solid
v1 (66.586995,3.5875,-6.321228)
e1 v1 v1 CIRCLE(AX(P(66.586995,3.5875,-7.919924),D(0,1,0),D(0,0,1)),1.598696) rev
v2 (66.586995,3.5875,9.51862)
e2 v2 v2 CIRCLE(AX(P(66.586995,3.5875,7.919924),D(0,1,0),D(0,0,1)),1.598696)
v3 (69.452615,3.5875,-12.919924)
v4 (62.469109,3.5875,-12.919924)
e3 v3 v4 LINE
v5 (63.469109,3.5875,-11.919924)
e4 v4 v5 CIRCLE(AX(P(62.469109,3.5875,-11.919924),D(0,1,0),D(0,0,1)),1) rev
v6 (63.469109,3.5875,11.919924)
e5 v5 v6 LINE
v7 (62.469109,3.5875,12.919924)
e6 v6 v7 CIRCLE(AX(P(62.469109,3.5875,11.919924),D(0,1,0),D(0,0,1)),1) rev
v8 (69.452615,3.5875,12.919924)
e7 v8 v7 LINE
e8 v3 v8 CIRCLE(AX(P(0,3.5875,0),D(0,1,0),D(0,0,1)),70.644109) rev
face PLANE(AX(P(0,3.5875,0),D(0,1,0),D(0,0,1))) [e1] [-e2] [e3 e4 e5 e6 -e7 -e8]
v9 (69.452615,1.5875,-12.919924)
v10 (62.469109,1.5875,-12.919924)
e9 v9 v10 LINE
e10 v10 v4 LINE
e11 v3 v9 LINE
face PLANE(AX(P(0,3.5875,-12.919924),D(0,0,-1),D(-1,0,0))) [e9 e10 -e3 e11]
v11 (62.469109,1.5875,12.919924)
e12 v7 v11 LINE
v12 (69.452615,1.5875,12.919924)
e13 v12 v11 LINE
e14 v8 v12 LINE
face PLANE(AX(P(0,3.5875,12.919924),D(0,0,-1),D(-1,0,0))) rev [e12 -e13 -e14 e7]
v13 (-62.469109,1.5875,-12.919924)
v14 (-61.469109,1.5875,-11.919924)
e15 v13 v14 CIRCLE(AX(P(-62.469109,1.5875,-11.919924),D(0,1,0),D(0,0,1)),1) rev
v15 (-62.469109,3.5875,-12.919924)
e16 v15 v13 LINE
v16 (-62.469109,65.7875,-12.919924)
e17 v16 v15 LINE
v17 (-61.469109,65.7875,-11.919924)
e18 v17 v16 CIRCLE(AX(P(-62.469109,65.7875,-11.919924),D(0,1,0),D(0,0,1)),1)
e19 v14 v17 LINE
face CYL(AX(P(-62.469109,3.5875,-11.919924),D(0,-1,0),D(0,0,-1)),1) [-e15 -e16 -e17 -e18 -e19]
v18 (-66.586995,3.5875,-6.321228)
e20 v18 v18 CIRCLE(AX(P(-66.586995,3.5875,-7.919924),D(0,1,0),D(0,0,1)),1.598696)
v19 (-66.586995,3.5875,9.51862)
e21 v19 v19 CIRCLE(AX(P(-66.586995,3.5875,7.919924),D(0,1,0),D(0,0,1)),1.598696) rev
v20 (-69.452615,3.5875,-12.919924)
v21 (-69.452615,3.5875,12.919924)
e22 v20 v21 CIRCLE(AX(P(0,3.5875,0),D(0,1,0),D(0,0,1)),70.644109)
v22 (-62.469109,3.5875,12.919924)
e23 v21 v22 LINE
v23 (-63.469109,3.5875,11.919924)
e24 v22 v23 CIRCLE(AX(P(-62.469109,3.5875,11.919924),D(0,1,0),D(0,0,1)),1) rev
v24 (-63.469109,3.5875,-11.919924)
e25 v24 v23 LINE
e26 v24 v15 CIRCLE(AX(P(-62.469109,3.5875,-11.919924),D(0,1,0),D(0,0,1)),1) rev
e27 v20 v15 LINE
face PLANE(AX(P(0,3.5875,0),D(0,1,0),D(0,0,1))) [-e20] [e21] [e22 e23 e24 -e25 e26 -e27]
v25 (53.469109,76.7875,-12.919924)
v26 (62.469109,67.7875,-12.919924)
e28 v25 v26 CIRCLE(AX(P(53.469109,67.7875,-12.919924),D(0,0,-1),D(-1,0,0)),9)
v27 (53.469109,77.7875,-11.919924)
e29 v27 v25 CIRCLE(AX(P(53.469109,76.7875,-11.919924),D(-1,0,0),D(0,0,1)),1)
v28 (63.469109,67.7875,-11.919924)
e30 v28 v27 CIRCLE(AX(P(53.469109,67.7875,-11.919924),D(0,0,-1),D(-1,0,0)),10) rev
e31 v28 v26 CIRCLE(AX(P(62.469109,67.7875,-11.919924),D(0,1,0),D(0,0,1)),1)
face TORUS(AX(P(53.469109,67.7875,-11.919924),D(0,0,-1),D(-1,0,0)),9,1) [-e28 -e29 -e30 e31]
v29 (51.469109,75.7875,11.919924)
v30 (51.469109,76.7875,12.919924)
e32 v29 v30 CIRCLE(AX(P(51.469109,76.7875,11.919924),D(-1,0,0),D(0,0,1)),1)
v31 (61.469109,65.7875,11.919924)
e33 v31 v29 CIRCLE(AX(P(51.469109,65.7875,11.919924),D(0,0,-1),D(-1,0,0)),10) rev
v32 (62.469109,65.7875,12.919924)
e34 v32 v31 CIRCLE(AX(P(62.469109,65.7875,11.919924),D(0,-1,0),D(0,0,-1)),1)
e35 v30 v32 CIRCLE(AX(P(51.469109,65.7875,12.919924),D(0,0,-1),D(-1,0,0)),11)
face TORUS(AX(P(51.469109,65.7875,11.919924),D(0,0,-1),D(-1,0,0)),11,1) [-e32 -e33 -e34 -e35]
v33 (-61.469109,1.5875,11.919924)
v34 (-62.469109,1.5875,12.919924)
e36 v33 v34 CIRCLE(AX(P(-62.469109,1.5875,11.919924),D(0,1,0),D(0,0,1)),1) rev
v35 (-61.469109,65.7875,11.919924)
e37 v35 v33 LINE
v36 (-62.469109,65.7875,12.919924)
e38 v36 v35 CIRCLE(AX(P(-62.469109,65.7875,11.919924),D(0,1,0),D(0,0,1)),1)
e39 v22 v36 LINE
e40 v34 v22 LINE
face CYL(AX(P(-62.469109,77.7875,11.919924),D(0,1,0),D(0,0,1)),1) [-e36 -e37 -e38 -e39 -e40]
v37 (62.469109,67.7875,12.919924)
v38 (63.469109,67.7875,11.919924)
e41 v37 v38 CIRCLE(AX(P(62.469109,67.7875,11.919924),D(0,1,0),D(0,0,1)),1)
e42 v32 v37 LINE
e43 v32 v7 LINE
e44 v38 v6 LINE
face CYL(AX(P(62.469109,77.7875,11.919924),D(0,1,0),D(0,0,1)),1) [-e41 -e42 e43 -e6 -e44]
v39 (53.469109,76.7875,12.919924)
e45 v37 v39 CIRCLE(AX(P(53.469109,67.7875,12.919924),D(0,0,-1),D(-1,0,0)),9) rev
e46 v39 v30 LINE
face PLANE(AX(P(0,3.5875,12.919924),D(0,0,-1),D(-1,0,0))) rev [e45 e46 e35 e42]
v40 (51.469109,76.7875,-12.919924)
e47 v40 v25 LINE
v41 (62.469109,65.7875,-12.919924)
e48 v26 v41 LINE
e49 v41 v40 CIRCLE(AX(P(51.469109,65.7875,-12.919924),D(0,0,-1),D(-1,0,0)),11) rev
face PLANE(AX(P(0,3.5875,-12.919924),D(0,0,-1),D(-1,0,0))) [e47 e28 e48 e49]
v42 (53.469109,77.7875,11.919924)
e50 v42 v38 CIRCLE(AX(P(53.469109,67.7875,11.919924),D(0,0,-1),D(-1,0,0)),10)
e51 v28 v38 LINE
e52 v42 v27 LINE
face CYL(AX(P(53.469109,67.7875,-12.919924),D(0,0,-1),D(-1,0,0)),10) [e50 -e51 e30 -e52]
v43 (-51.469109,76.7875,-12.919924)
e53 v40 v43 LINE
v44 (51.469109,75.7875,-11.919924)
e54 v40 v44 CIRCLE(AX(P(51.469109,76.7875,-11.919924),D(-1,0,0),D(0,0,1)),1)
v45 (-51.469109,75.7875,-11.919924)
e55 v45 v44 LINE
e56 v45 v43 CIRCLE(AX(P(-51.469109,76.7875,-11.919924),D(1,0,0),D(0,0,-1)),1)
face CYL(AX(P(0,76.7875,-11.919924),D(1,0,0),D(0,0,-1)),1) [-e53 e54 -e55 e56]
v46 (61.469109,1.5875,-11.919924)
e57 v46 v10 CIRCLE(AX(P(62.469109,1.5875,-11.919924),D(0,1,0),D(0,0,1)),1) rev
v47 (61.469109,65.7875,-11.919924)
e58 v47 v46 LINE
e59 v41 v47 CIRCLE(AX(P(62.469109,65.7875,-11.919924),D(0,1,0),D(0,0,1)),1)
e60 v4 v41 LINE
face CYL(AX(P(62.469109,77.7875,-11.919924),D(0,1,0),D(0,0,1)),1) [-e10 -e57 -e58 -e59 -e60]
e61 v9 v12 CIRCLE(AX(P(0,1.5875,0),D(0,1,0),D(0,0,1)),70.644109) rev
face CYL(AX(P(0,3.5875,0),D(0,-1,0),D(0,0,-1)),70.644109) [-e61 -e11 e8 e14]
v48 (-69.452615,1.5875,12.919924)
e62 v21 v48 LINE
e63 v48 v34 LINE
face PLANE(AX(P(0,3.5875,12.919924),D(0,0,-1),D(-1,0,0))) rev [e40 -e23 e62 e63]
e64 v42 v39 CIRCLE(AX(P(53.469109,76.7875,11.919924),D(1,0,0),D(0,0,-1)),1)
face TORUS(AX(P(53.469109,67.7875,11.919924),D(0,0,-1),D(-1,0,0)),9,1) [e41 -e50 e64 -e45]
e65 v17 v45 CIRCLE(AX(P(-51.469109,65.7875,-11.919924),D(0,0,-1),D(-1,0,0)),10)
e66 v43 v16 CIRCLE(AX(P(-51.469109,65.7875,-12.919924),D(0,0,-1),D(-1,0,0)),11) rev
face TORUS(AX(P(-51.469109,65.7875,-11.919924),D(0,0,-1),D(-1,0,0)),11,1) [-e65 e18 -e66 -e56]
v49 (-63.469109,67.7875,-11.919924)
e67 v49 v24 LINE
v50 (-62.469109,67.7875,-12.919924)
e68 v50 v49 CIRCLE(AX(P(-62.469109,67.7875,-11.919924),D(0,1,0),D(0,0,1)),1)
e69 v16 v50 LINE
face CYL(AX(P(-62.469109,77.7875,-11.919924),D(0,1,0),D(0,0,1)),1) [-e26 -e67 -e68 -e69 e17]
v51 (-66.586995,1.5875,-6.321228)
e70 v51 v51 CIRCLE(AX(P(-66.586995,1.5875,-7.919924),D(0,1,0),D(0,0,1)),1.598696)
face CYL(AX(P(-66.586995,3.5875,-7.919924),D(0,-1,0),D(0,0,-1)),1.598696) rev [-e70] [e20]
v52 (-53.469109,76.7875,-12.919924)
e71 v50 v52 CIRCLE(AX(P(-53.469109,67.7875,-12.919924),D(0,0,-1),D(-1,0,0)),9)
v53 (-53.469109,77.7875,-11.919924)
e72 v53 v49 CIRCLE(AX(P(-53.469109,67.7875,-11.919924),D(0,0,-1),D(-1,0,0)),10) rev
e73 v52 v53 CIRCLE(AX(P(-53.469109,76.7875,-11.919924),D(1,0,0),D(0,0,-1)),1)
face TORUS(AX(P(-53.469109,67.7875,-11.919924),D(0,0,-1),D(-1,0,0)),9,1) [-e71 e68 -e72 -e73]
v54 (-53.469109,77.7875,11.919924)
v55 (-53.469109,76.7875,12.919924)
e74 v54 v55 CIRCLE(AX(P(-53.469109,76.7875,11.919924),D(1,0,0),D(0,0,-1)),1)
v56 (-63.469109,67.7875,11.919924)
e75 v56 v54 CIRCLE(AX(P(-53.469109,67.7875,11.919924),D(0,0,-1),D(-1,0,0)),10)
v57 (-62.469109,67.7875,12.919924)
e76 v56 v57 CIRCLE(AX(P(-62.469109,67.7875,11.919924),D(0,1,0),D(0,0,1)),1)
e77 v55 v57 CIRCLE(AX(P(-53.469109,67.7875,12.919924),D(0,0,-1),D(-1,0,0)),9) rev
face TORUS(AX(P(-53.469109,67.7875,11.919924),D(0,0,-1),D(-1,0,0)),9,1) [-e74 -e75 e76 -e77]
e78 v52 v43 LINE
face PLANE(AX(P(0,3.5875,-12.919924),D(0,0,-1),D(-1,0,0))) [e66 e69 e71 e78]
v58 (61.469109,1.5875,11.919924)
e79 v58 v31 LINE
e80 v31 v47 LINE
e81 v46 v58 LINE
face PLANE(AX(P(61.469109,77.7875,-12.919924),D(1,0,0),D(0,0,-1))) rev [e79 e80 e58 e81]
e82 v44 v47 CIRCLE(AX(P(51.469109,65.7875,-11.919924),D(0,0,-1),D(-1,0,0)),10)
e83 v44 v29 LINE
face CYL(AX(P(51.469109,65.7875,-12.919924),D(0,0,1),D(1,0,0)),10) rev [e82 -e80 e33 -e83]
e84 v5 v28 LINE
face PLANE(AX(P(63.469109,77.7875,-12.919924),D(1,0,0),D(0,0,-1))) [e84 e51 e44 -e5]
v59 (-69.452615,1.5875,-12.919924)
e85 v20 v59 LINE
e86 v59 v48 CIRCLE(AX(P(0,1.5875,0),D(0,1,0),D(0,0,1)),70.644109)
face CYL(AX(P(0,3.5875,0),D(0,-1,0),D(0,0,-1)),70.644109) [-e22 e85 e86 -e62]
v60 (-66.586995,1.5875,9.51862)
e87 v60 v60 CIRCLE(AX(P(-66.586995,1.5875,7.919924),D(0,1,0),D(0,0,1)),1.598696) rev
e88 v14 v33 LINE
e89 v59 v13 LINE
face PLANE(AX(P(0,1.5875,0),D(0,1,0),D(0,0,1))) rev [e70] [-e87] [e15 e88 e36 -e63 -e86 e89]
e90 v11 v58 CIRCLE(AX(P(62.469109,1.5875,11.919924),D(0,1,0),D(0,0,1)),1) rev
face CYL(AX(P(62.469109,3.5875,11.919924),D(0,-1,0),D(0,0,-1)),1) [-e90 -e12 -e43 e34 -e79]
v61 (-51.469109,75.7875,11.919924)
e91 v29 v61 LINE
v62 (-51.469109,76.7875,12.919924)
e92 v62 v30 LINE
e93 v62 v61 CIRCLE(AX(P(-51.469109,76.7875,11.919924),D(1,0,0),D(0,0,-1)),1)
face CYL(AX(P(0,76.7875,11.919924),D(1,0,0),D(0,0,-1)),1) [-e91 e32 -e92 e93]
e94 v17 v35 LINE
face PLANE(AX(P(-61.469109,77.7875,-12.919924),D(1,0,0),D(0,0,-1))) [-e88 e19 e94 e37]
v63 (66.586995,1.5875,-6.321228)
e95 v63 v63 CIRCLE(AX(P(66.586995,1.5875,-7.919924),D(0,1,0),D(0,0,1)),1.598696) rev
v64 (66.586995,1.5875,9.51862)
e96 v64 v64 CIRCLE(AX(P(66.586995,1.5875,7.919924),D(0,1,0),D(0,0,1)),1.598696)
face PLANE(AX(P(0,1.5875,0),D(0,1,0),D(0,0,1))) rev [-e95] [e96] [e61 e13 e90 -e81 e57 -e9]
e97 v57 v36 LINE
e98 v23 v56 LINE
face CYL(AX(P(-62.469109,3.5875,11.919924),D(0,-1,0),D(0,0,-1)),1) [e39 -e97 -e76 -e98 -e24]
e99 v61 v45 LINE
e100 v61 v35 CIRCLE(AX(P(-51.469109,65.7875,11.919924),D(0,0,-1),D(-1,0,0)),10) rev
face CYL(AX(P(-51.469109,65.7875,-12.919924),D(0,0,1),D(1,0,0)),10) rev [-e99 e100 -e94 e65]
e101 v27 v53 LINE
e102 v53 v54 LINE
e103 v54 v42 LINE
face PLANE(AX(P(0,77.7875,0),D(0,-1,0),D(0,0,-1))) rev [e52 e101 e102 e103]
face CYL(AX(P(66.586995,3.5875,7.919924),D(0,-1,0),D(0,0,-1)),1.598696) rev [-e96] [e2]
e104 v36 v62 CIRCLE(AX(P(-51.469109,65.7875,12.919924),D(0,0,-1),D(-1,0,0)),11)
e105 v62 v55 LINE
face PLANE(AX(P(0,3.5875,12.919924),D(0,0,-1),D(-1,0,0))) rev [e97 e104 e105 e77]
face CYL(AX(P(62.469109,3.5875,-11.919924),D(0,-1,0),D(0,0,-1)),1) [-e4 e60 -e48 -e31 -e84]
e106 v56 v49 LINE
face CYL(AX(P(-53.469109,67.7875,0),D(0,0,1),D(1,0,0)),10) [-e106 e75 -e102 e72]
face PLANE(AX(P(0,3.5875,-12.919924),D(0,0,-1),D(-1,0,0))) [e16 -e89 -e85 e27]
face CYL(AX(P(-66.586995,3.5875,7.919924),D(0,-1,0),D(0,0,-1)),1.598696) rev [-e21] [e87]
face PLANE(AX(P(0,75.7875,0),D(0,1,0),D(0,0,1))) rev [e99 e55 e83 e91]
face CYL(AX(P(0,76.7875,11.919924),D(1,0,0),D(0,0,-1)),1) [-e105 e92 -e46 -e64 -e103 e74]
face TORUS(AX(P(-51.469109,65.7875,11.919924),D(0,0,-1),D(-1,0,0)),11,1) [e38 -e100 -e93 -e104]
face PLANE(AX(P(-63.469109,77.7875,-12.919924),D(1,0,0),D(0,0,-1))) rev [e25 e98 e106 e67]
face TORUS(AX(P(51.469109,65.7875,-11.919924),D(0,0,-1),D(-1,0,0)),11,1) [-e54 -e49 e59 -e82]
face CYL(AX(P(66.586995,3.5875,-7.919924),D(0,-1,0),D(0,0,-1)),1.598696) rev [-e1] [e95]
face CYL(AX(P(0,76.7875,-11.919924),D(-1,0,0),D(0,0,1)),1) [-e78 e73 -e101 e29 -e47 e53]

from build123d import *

# Parameters (mm, degrees)
SKETCH1_R            = 1.5875
BOSS_EXTRUDE5_DEPTH  = 1.5875
FILLET2_R            = 2.54
FILLET3_R            = 2.54
FILLET4_R            = 5.08
CUT_EXTRUDE1_START   = -2.54
SKETCH2_R            = 2.38125
SKETCH2_R_2          = 1.5875
CUT_EXTRUDE1_DEPTH   = 2.54
SKETCH3_R            = 1.5875
CUT_EXTRUDE2_DEPTH   = 2.54
CUT_EXTRUDE3_DEPTH   = 2.54
SKETCH5_W            = 15
SKETCH5_H            = 34.925
CUT_EXTRUDE4_DEPTH   = 109.650407999
FILLET5_R            = 7.62
FILLET6_R            = 7.62
BOSS_EXTRUDE6_START  = -1.5875
BOSS_EXTRUDE6_DEPTH  = 1.5875
SKETCH7_R            = 79.375
CUT_EXTRUDE5_DEPTH   = 0.5875
BOSS_EXTRUDE7_START  = -1
SKETCH8_R            = 1.5875
SKETCH8_R_2          = 2.38125
BOSS_EXTRUDE7_DEPTH  = 1
SKETCH9_R            = 1.5875
CUT_EXTRUDE7_DEPTH   = 2.54
BOSS_EXTRUDE8_START  = -1
BOSS_EXTRUDE8_DEPTH  = 1
CUT_EXTRUDE9_START   = -2.54
CUT_EXTRUDE9_DEPTH   = 2.54
BOSS_EXTRUDE9_START  = -1
BOSS_EXTRUDE9_DEPTH  = 1
CUT_EXTRUDE10_START  = -2.54
CUT_EXTRUDE10_DEPTH  = 2.54
BOSS_EXTRUDE10_START = -1
BOSS_EXTRUDE10_DEPTH = 1
CUT_EXTRUDE11_START  = -2.54
CUT_EXTRUDE11_DEPTH  = 2.54
BOSS_EXTRUDE11_START = -1
BOSS_EXTRUDE11_DEPTH = 1
SKETCH18_R           = 1.598696058
BOSS_EXTRUDE14_DEPTH = 2
SKETCH22_W           = 2
SKETCH22_H           = 25.839848816
BOSS_EXTRUDE16_DEPTH = 76.2
SKETCH23_W           = 122.93821768
SKETCH23_H           = 25.839848816
BOSS_EXTRUDE17_DEPTH = 2
FILLET7_R            = 10
CUT_EXTRUDE12_START  = -2
SKETCH24_R           = 79.375
CUT_EXTRUDE12_DEPTH  = 2
FILLET11_R           = 1
FILLET12_R           = 1


# Some blends are built 0.0001 mm under size
with BuildPart() as part:
    # Sketch1 → Boss-Extrude5 (new body)
    with BuildSketch(Plane(origin=(0, 0, 0), x_dir=(1, 0, 0), z_dir=(0, 1, 0))):
        with BuildLine():
            ThreePointArc((-63.5, -47.625), (-35.497579143, -70.995158286), (0, -79.375))
            ThreePointArc((0, -79.375), (35.497579143, -70.995158286), (63.5, -47.625))
            Line((63.5, -47.625), (50.8, -47.625))
            Line((50.8, -47.625), (50.8, 22.225))
            Line((50.8, 22.225), (76.2, 22.225))
            ThreePointArc((76.2, 22.225), (0, 79.375), (-76.2, 22.225))
            Line((-76.2, 22.225), (-50.8, 22.225))
            Line((-50.8, 22.225), (-50.8, -47.625))
            Line((-50.8, -47.625), (-63.5, -47.625))
        make_face()
        with Locations(Location((-7.14375, -66.675, 0), (0, 0, 270))):
            Circle(SKETCH1_R, mode=Mode.SUBTRACT)
        with BuildLine():
            ThreePointArc((8.73125, -66.675), (7.14375, -68.2625), (5.55625, -66.675))
            ThreePointArc((5.55625, -66.675), (7.14375, -65.0875), (8.73125, -66.675))
        make_face(mode=Mode.SUBTRACT)
        with Locations(Location((-7.14375, 66.675, 0), (0, 0, 270))):
            Circle(SKETCH1_R, mode=Mode.SUBTRACT)
        with Locations(Location((7.14375, 66.675, 0), (0, 0, 270))):
            Circle(SKETCH1_R, mode=Mode.SUBTRACT)
    extrude(amount=BOSS_EXTRUDE5_DEPTH)

    # Fillet2
    fillet2_edges = [part.edges().sort_by_distance(p)[0] for p in [
        (-63.5, 0.79375, 47.625),
    ]]
    fillet(fillet2_edges, radius=FILLET2_R)

    # Fillet3
    fillet3_edges = [part.edges().sort_by_distance(p)[0] for p in [
        (63.5, 0.79375, 47.625),
    ]]
    fillet(fillet3_edges, radius=FILLET3_R)

    # Fillet4
    fillet4_edges = [part.edges().sort_by_distance(p)[0] for p in [
        (-76.2, 0.79375, -22.225),
        (76.2, 0.79375, -22.225),
    ]]
    fillet(fillet4_edges, radius=FILLET4_R)

    # Sketch2 → Cut-Extrude1 (cut)
    # profile 1 of 10: a face of its own
    with BuildSketch(Plane(origin=(0, 1.5875, 0), x_dir=(1, 0, 0), z_dir=(0, 1, 0)).offset(CUT_EXTRUDE1_START)):
        with BuildLine():
            Line((-61.088622125, 27.654457796), (-59.642408406, 26.999765402))
            ThreePointArc((-59.642408406, 26.999765402), (-52.384826382, 39.268743005), (-42.643785254, 49.676068599))
            Line((-42.643785254, 49.676068599), (-43.677815048, 50.880617741))
            Line((-43.677815048, 50.880617741), (-44.711844841, 52.085166883))
            ThreePointArc((-44.711844841, 52.085166883), (-54.925289002, 41.173126022), (-62.534835843, 28.309150189))
            Line((-62.534835843, 28.309150189), (-61.088622125, 27.654457796))
        make_face()
    # profile 2 of 10: a face of its own
    with BuildSketch(Plane(origin=(0, 1.5875, 0), x_dir=(1, 0, 0), z_dir=(0, 1, 0)).offset(CUT_EXTRUDE1_START)):
        with BuildLine():
            Line((-39.077069744, 54.493774041), (-38.151958122, 53.203686937))
            ThreePointArc((-38.151958122, 53.203686937), (-25.732218917, 60.200142208), (-12.092567045, 64.342629994))
            Line((-12.092567045, 64.342629994), (-12.385788543, 65.902815048))
            Line((-12.385788543, 65.902815048), (-12.679010041, 67.463000102))
            ThreePointArc((-12.679010041, 67.463000102), (-26.980132574, 63.119617589), (-40.002181367, 55.783861145))
            Line((-40.002181367, 55.783861145), (-39.077069744, 54.493774041))
        make_face()
    # profile 3 of 10: a face of its own
    with BuildSketch(Plane(origin=(0, 1.5875, 0), x_dir=(1, 0, 0), z_dir=(0, 1, 0)).offset(CUT_EXTRUDE1_START)):
        with Locations(Location((-7.14375, 66.675, 0), (0, 0, 270))):
            Circle(SKETCH2_R)
        with Locations((-7.14375, 66.675)):
            Circle(SKETCH2_R_2, mode=Mode.SUBTRACT)
    # profile 4 of 10: a face of its own
    with BuildSketch(Plane(origin=(0, 1.5875, 0), x_dir=(1, 0, 0), z_dir=(0, 1, 0)).offset(CUT_EXTRUDE1_START)):
        with Locations(Location((7.14375, 66.675, 0), (0, 0, 270))):
            Circle(SKETCH2_R)
        with Locations((7.14375, 66.675)):
            Circle(SKETCH2_R_2, mode=Mode.SUBTRACT)
    # profile 5 of 10: a face of its own
    with BuildSketch(Plane(origin=(0, 1.5875, 0), x_dir=(1, 0, 0), z_dir=(0, 1, 0)).offset(CUT_EXTRUDE1_START)):
        with BuildLine():
            ThreePointArc((12.679010041, 67.463000102), (26.980132574, 63.119617589), (40.002181367, 55.783861145))
            Line((40.002181367, 55.783861145), (39.077069744, 54.493774041))
            Line((39.077069744, 54.493774041), (38.151958122, 53.203686937))
            ThreePointArc((38.151958122, 53.203686937), (25.732218917, 60.200142208), (12.092567045, 64.342629994))
            Line((12.092567045, 64.342629994), (12.385788543, 65.902815048))
            Line((12.385788543, 65.902815048), (12.679010041, 67.463000102))
        make_face()
    # profile 6 of 10: a face of its own
    with BuildSketch(Plane(origin=(0, 1.5875, 0), x_dir=(1, 0, 0), z_dir=(0, 1, 0)).offset(CUT_EXTRUDE1_START)):
        with BuildLine():
            ThreePointArc((44.711844841, 52.085166883), (54.925289002, 41.173126022), (62.534835843, 28.309150189))
            Line((62.534835843, 28.309150189), (59.642408406, 26.999765402))
            ThreePointArc((59.642408406, 26.999765402), (52.384826382, 39.268743005), (42.643785254, 49.676068599))
            Line((42.643785254, 49.676068599), (43.677815048, 50.880617741))
            Line((43.677815048, 50.880617741), (44.711844841, 52.085166883))
        make_face()
    # profile 7 of 10: a face of its own
    with BuildSketch(Plane(origin=(0, 1.5875, 0), x_dir=(1, 0, 0), z_dir=(0, 1, 0)).offset(CUT_EXTRUDE1_START)):
        with BuildLine():
            ThreePointArc((-12.679010041, -67.463000102), (-26.980132574, -63.119617589), (-40.002181367, -55.783861145))
            Line((-40.002181367, -55.783861145), (-39.077069744, -54.493774041))
            Line((-39.077069744, -54.493774041), (-38.151958122, -53.203686937))
            ThreePointArc((-38.151958122, -53.203686937), (-25.732218917, -60.200142208), (-12.092567045, -64.342629994))
            Line((-12.092567045, -64.342629994), (-12.385788543, -65.902815048))
            Line((-12.385788543, -65.902815048), (-12.679010041, -67.463000102))
        make_face()
    # profile 8 of 10: a face of its own
    with BuildSketch(Plane(origin=(0, 1.5875, 0), x_dir=(1, 0, 0), z_dir=(0, 1, 0)).offset(CUT_EXTRUDE1_START)):
        with Locations(Location((-7.14375, -66.675, 0), (0, 0, 270))):
            Circle(SKETCH2_R)
        with Locations((-7.14375, -66.675)):
            Circle(SKETCH2_R_2, mode=Mode.SUBTRACT)
    # profile 9 of 10: a face of its own
    with BuildSketch(Plane(origin=(0, 1.5875, 0), x_dir=(1, 0, 0), z_dir=(0, 1, 0)).offset(CUT_EXTRUDE1_START)):
        with Locations(Location((7.14375, -66.675, 0), (0, 0, 270))):
            Circle(SKETCH2_R)
        with Locations((7.14375, -66.675)):
            Circle(SKETCH2_R_2, mode=Mode.SUBTRACT)
    # profile 10 of 10: a face of its own
    with BuildSketch(Plane(origin=(0, 1.5875, 0), x_dir=(1, 0, 0), z_dir=(0, 1, 0)).offset(CUT_EXTRUDE1_START)):
        with BuildLine():
            ThreePointArc((12.092567045, -64.342629994), (25.732218917, -60.200142208), (38.151958122, -53.203686937))
            Line((38.151958122, -53.203686937), (39.077069744, -54.493774041))
            Line((39.077069744, -54.493774041), (40.002181367, -55.783861145))
            ThreePointArc((40.002181367, -55.783861145), (26.980132574, -63.119617589), (12.679010041, -67.463000102))
            Line((12.679010041, -67.463000102), (12.385788543, -65.902815048))
            Line((12.385788543, -65.902815048), (12.092567045, -64.342629994))
        make_face()
    extrude(amount=CUT_EXTRUDE1_DEPTH, mode=Mode.SUBTRACT)

    # Sketch3 → Cut-Extrude2 (cut)
    with BuildSketch(Plane(origin=(0, 1.5875, 0), x_dir=(1, 0, 0), z_dir=(0, 1, 0))):
        with Locations(Location((-44.45, -47.625, 0), (0, 0, 270))):
            Circle(SKETCH3_R)
        with Locations(Location((-44.45, 22.225, 0), (0, 0, 270))):
            Circle(SKETCH3_R)
        with Locations(Location((44.45, 22.225, 0), (0, 0, 270))):
            Circle(SKETCH3_R)
        with Locations(Location((44.45, -47.625, 0), (0, 0, 270))):
            Circle(SKETCH3_R)
    extrude(amount=-CUT_EXTRUDE2_DEPTH, mode=Mode.SUBTRACT)

    # Sketch4 → Cut-Extrude3 (cut)
    with BuildSketch(Plane(origin=(0, 1.5875, 0), x_dir=(1, 0, 0), z_dir=(0, 1, 0))):
        with BuildLine():
            ThreePointArc((-44.45, -11.1125), (-46.0375, -12.7), (-44.45, -14.2875))
            Line((-44.45, -14.2875), (-44.45, -11.1125))
        make_face()
        with BuildLine():
            Line((-44.45, -11.1125), (-44.45, -14.2875))
            ThreePointArc((-44.45, -14.2875), (-43.327467985, -13.822532015), (-42.8625, -12.7))
            ThreePointArc((-42.8625, -12.7), (-43.327467985, -11.577467985), (-44.45, -11.1125))
        make_face()
        with BuildLine():
            ThreePointArc((44.45, -11.1125), (42.8625, -12.7), (44.45, -14.2875))
            Line((44.45, -14.2875), (44.45, -11.1125))
        make_face()
        with BuildLine():
            Line((44.45, -11.1125), (44.45, -14.2875))
            ThreePointArc((44.45, -14.2875), (45.572532015, -13.822532015), (46.0375, -12.7))
            ThreePointArc((46.0375, -12.7), (45.572532015, -11.577467985), (44.45, -11.1125))
        make_face()
    extrude(amount=-CUT_EXTRUDE3_DEPTH, mode=Mode.SUBTRACT)

    # Sketch5 → Cut-Extrude4 (cut, through all)
    with BuildSketch(Plane(origin=(0, 1.5875, 0), x_dir=(1, 0, 0), z_dir=(0, 1, 0))):
        with Locations((-27.3, 4.7625)):
            Rectangle(SKETCH5_W, SKETCH5_H)
        with Locations((27.3, 4.7625)):
            Rectangle(SKETCH5_W, SKETCH5_H)
    extrude(amount=-CUT_EXTRUDE4_DEPTH, mode=Mode.SUBTRACT)

    # Fillet5
    # the kernel refuses this fillet: 7.62 mm, written as the material it adds along each edge
    with BuildSketch(Plane(origin=(-19.8, 1.5875, 12.7), x_dir=(0, 0, -1), z_dir=(0, -1, 0))) as fillet5_piece_1:
        with BuildLine():
            CenterArc((FILLET5_R, -FILLET5_R), FILLET5_R, 90, 90)
            Line((0, -FILLET5_R), (0, 0))
            Line((0, 0), (FILLET5_R, 0))
        make_face()
    extrude(amount=1.5875)
    with BuildSketch(Plane(origin=(-34.8, 1.5875, 12.7), x_dir=(0, 0, -1), z_dir=(0, -1, 0)), Plane(origin=(-19.8, 1.5875, -22.225), x_dir=(0, 0, 1), z_dir=(0, -1, 0)), Plane(origin=(-34.8, 1.5875, -22.225), x_dir=(1, 0, 0), z_dir=(0, -1, 0))) as fillet5_piece_2:
        with BuildLine():
            CenterArc((FILLET5_R, FILLET5_R), FILLET5_R, 180, 90)
            Line((0, FILLET5_R), (0, 0))
            Line((0, 0), (FILLET5_R, 0))
        make_face()
    extrude(amount=1.5875)

    # Fillet6
    # the kernel refuses this fillet: 7.62 mm, written as the material it adds along each edge
    with BuildSketch(Plane(origin=(34.8, 1.5875, 12.7), x_dir=(0, 0, -1), z_dir=(0, -1, 0)), Plane(origin=(34.8, 1.5875, -22.225), x_dir=(-1, 0, 0), z_dir=(0, -1, 0))) as fillet6_piece_1:
        with BuildLine():
            CenterArc((FILLET6_R, -FILLET6_R), FILLET6_R, 90, 90)
            Line((0, -FILLET6_R), (0, 0))
            Line((0, 0), (FILLET6_R, 0))
        make_face()
    extrude(amount=1.5875)
    with BuildSketch(Plane(origin=(19.8, 1.5875, -22.225), x_dir=(1, 0, 0), z_dir=(0, -1, 0)), Plane(origin=(19.8, 1.5875, 12.7), x_dir=(0, 0, -1), z_dir=(0, -1, 0))) as fillet6_piece_2:
        with BuildLine():
            CenterArc((FILLET6_R, FILLET6_R), FILLET6_R, 180, 90)
            Line((0, FILLET6_R), (0, 0))
            Line((0, 0), (FILLET6_R, 0))
        make_face()
    extrude(amount=1.5875)

    # Sketch6 → Boss-Extrude6 (add)
    with BuildSketch(Plane(origin=(0, 1.5875, 0), x_dir=(1, 0, 0), z_dir=(0, 1, 0)).offset(BOSS_EXTRUDE6_START)):
        with BuildLine():
            Line((-50.8, -60.989758362), (-50.8, 22.225))
            Line((-50.8, 22.225), (-69.095470184, 22.225))
            Line((-69.095470184, 22.225), (-69.095470184, 39.066694575))
            ThreePointArc((-69.095470184, 39.066694575), (-78.080435361, -14.277122916), (-50.8, -60.989758362))
        make_face()
        with BuildLine():
            Line((50.8, 22.225), (50.8, -60.989758362))
            ThreePointArc((50.8, -60.989758362), (71.877119534, -33.675960454), (79.375, 0))
            ThreePointArc((79.375, 0), (76.762111653, 20.198238526), (69.095470184, 39.066694575))
            Line((69.095470184, 39.066694575), (69.095470184, 22.225))
            Line((69.095470184, 22.225), (50.8, 22.225))
        make_face()
    extrude(amount=BOSS_EXTRUDE6_DEPTH)

    # Sketch7 → Cut-Extrude5 (cut)
    with BuildSketch(Plane.XZ):
        with Locations(Location((0, 0, 0), (0, 0, 270))):
            Circle(SKETCH7_R)
    extrude(amount=-CUT_EXTRUDE5_DEPTH, mode=Mode.SUBTRACT)

    # Sketch8 → Boss-Extrude7 (add)
    with BuildSketch(Plane(origin=(0, 1.5875, 0), x_dir=(1, 0, 0), z_dir=(0, 1, 0)).offset(BOSS_EXTRUDE7_START)):
        with Locations((-44.45, -12.7)):
            Circle(SKETCH8_R)
        with Locations((44.45, -12.7)):
            Circle(SKETCH8_R)
        with Locations((-7.14375, -66.675)):
            Circle(SKETCH8_R_2)
        with Locations((7.14375, -66.675)):
            Circle(SKETCH8_R_2)
        with Locations((-7.14375, 66.675)):
            Circle(SKETCH8_R_2)
        with Locations((7.14375, 66.675)):
            Circle(SKETCH8_R_2)
    extrude(amount=BOSS_EXTRUDE7_DEPTH)

    # Sketch9 → Cut-Extrude7 (cut)
    with BuildSketch(Plane(origin=(0, 1.5875, 0), x_dir=(1, 0, 0), z_dir=(0, 1, 0))):
        with Locations(Location((-44.45, -1.058333333, 0), (0, 0, 270))):
            Circle(SKETCH9_R)
        with Locations(Location((-44.45, -24.341666667, 0), (0, 0, 270))):
            Circle(SKETCH9_R)
        with Locations(Location((44.45, -24.341666667, 0), (0, 0, 270))):
            Circle(SKETCH9_R)
        with Locations(Location((44.45, -1.058333333, 0), (0, 0, 270))):
            Circle(SKETCH9_R)
    extrude(amount=-CUT_EXTRUDE7_DEPTH, mode=Mode.SUBTRACT)

    # Sketch10 → Boss-Extrude8 (add)
    with BuildSketch(Plane(origin=(0, 1.5875, 0), x_dir=(1, 0, 0), z_dir=(0, 1, 0)).offset(BOSS_EXTRUDE8_START)):
        with BuildLine():
            Line((-44.711844841, 52.085166883), (-42.643785254, 49.676068599))
            ThreePointArc((-42.643785254, 49.676068599), (-52.384826382, 39.268743005), (-59.642408406, 26.999765402))
            Line((-59.642408406, 26.999765402), (-62.534835843, 28.309150189))
            ThreePointArc((-62.534835843, 28.309150189), (-54.925289002, 41.173126022), (-44.711844841, 52.085166883))
        make_face()
        with BuildLine():
            Line((-12.679010041, 67.463000102), (-12.092567045, 64.342629994))
            ThreePointArc((-12.092567045, 64.342629994), (-25.732218917, 60.200142208), (-38.151958122, 53.203686937))
            Line((-38.151958122, 53.203686937), (-40.002181367, 55.783861145))
            ThreePointArc((-40.002181367, 55.783861145), (-26.980132574, 63.119617589), (-12.679010041, 67.463000102))
        make_face()
        with BuildLine():
            Line((12.092567045, 64.342629994), (12.679010041, 67.463000102))
            ThreePointArc((12.679010041, 67.463000102), (26.980132574, 63.119617589), (40.002181367, 55.783861145))
            Line((40.002181367, 55.783861145), (38.151958122, 53.203686937))
            ThreePointArc((38.151958122, 53.203686937), (25.732218917, 60.200142208), (12.092567045, 64.342629994))
        make_face()
        with BuildLine():
            Line((42.643785254, 49.676068599), (44.711844841, 52.085166883))
            ThreePointArc((44.711844841, 52.085166883), (54.925289002, 41.173126022), (62.534835843, 28.309150189))
            Line((62.534835843, 28.309150189), (59.642408406, 26.999765402))
            ThreePointArc((59.642408406, 26.999765402), (52.384826382, 39.268743005), (42.643785254, 49.676068599))
        make_face()
    extrude(amount=BOSS_EXTRUDE8_DEPTH)

    # Sketch11 → Cut-Extrude9 (cut)
    with BuildSketch(Plane(origin=(0, 1.5875, 0), x_dir=(1, 0, 0), z_dir=(0, 1, 0)).offset(CUT_EXTRUDE9_START)):
        with BuildLine():
            Line((11.919924408, -67.601250584), (11.368591443, -64.474485968))
            ThreePointArc((11.368591443, -64.474485968), (0, -65.46910884), (-11.368591443, -64.474485968))
            Line((-11.368591443, -64.474485968), (-11.919924408, -67.601250584))
            ThreePointArc((-11.919924408, -67.601250584), (0, -68.64410884), (11.919924408, -67.601250584))
        make_face()
        with BuildLine():
            Line((-11.919924408, 67.601250584), (-11.368591443, 64.474485968))
            ThreePointArc((-11.368591443, 64.474485968), (0, 65.46910884), (11.368591443, 64.474485968))
            Line((11.368591443, 64.474485968), (11.919924408, 67.601250584))
            ThreePointArc((11.919924408, 67.601250584), (0, 68.64410884), (-11.919924408, 67.601250584))
        make_face()
        with BuildLine():
            Line((-48.538714849, 48.538714849), (-46.293650819, 46.293650819))
            ThreePointArc((-46.293650819, 46.293650819), (-42.082731979, 50.152247023), (-37.551538139, 53.629154344))
            Line((-37.551538139, 53.629154344), (-39.372643325, 56.229962084))
            ThreePointArc((-39.372643325, 56.229962084), (-44.12358264, 52.584438129), (-48.538714849, 48.538714849))
        make_face()
        with BuildLine():
            ThreePointArc((-53.629154344, 37.551538139), (-50.152247023, 42.082731979), (-46.293650819, 46.293650819))
            Line((-46.293650819, 46.293650819), (-48.538714849, 48.538714849))
            ThreePointArc((-48.538714849, 48.538714849), (-52.584438129, 44.12358264), (-56.229962084, 39.372643325))
            Line((-56.229962084, 39.372643325), (-53.629154344, 37.551538139))
        make_face()
        with BuildLine():
            Line((-68.64410884, 0), (-65.46910884, 0))
            ThreePointArc((-65.46910884, 0), (-65.219979115, 5.706008808), (-64.474485968, 11.368591443))
            Line((-64.474485968, 11.368591443), (-67.601250584, 11.919924408))
            ThreePointArc((-67.601250584, 11.919924408), (-68.382897281, 5.982728291), (-68.64410884, 0))
        make_face()
        with BuildLine():
            ThreePointArc((-64.474485968, -11.368591443), (-65.219979115, -5.706008808), (-65.46910884, 0))
            Line((-65.46910884, 0), (-68.64410884, 0))
            ThreePointArc((-68.64410884, 0), (-68.382897281, -5.982728291), (-67.601250584, -11.919924408))
            Line((-67.601250584, -11.919924408), (-64.474485968, -11.368591443))
        make_face()
        with BuildLine():
            Line((67.601250584, 11.919924408), (64.474485968, 11.368591443))
            ThreePointArc((64.474485968, 11.368591443), (65.219979115, 5.706008808), (65.46910884, 0))
            ThreePointArc((65.46910884, 0), (65.219979115, -5.706008808), (64.474485968, -11.368591443))
            Line((64.474485968, -11.368591443), (67.601250584, -11.919924408))
            ThreePointArc((67.601250584, -11.919924408), (68.382897281, -5.982728291), (68.64410884, 0))
            ThreePointArc((68.64410884, 0), (68.382897281, 5.982728291), (67.601250584, 11.919924408))
        make_face()
        with BuildLine():
            Line((48.538714849, 48.538714849), (46.293650819, 46.293650819))
            ThreePointArc((46.293650819, 46.293650819), (50.152247023, 42.082731979), (53.629154344, 37.551538139))
            Line((53.629154344, 37.551538139), (56.229962084, 39.372643325))
            ThreePointArc((56.229962084, 39.372643325), (52.584438129, 44.12358264), (48.538714849, 48.538714849))
        make_face()
        with BuildLine():
            ThreePointArc((37.551538139, 53.629154344), (42.082731979, 50.152247023), (46.293650819, 46.293650819))
            Line((46.293650819, 46.293650819), (48.538714849, 48.538714849))
            ThreePointArc((48.538714849, 48.538714849), (44.12358264, 52.584438129), (39.372643325, 56.229962084))
            Line((39.372643325, 56.229962084), (37.551538139, 53.629154344))
        make_face()
    extrude(amount=CUT_EXTRUDE9_DEPTH, mode=Mode.SUBTRACT)

    # Sketch12 → Boss-Extrude9 (add)
    with BuildSketch(Plane(origin=(0, 1.5875, 0), x_dir=(1, 0, 0), z_dir=(0, 1, 0)).offset(BOSS_EXTRUDE9_START)):
        with BuildLine():
            ThreePointArc((-12.092567045, -64.342629994), (-14.887643702, -63.753919701), (-17.654380884, -63.043850199))
            Line((-17.654380884, -63.043850199), (-18.510550462, -66.101234482))
            ThreePointArc((-18.510550462, -66.101234482), (-15.609637167, -66.845739624), (-12.679010041, -67.463000102))
            Line((-12.679010041, -67.463000102), (-12.092567045, -64.342629994))
        make_face()
        with BuildLine():
            Line((18.510550462, -66.101234482), (17.654380884, -63.043850199))
            ThreePointArc((17.654380884, -63.043850199), (14.887643702, -63.753919701), (12.092567045, -64.342629994))
            Line((12.092567045, -64.342629994), (12.679010041, -67.463000102))
            ThreePointArc((12.679010041, -67.463000102), (15.609637167, -66.845739624), (18.510550462, -66.101234482))
        make_face()
    extrude(amount=BOSS_EXTRUDE9_DEPTH)

    # Sketch13 → Cut-Extrude10 (cut)
    with BuildSketch(Plane(origin=(0, 1.5875, 0), x_dir=(1, 0, 0), z_dir=(0, 1, 0)).offset(CUT_EXTRUDE10_START)):
        with BuildLine():
            Line((-52.584438129, -44.12358264), (-50.152247023, -42.082731979))
            ThreePointArc((-50.152247023, -42.082731979), (-56.697911418, -32.73455442), (-61.520838466, -22.391753989))
            Line((-61.520838466, -22.391753989), (-64.504362537, -23.477667944))
            ThreePointArc((-64.504362537, -23.477667944), (-59.447542075, -34.32205442), (-52.584438129, -44.12358264))
        make_face()
        with BuildLine():
            Line((64.504362537, -23.477667944), (61.520838466, -22.391753989))
            ThreePointArc((61.520838466, -22.391753989), (56.697911418, -32.73455442), (50.152247023, -42.082731979))
            Line((50.152247023, -42.082731979), (52.584438129, -44.12358264))
            ThreePointArc((52.584438129, -44.12358264), (59.447542075, -34.32205442), (64.504362537, -23.477667944))
        make_face()
        with BuildLine():
            Line((52.584438129, 44.12358264), (50.152247023, 42.082731979))
            ThreePointArc((50.152247023, 42.082731979), (56.697911418, 32.73455442), (61.520838466, 22.391753989))
            Line((61.520838466, 22.391753989), (64.504362537, 23.477667944))
            ThreePointArc((64.504362537, 23.477667944), (59.447542075, 34.32205442), (52.584438129, 44.12358264))
        make_face()
        with BuildLine():
            Line((23.477667944, 64.504362537), (22.391753989, 61.520838466))
            ThreePointArc((22.391753989, 61.520838466), (32.73455442, 56.697911418), (42.082731979, 50.152247023))
            Line((42.082731979, 50.152247023), (44.12358264, 52.584438129))
            ThreePointArc((44.12358264, 52.584438129), (34.32205442, 59.447542075), (23.477667944, 64.504362537))
        make_face()
        with BuildLine():
            Line((-44.12358264, 52.584438129), (-42.082731979, 50.152247023))
            ThreePointArc((-42.082731979, 50.152247023), (-32.73455442, 56.697911418), (-22.391753989, 61.520838466))
            Line((-22.391753989, 61.520838466), (-23.477667944, 64.504362537))
            ThreePointArc((-23.477667944, 64.504362537), (-34.32205442, 59.447542075), (-44.12358264, 52.584438129))
        make_face()
        with BuildLine():
            Line((-64.504362537, 23.477667944), (-61.520838466, 22.391753989))
            ThreePointArc((-61.520838466, 22.391753989), (-56.697911418, 32.73455442), (-50.152247023, 42.082731979))
            Line((-50.152247023, 42.082731979), (-52.584438129, 44.12358264))
            ThreePointArc((-52.584438129, 44.12358264), (-59.447542075, 34.32205442), (-64.504362537, 23.477667944))
        make_face()
    extrude(amount=CUT_EXTRUDE10_DEPTH, mode=Mode.SUBTRACT)

    # Sketch15 → Boss-Extrude10 (add)
    with BuildSketch(Plane(origin=(0, 1.5875, 0), x_dir=(1, 0, 0), z_dir=(0, 1, 0)).offset(BOSS_EXTRUDE10_START)):
        with BuildLine():
            Line((-52.584438129, 44.12358264), (-50.152247023, 42.082731979))
            ThreePointArc((-50.152247023, 42.082731979), (-46.293650819, 46.293650819), (-42.082731979, 50.152247023))
            Line((-42.082731979, 50.152247023), (-44.12358264, 52.584438129))
            ThreePointArc((-44.12358264, 52.584438129), (-48.538714849, 48.538714849), (-52.584438129, 44.12358264))
        make_face()
        with BuildLine():
            Line((44.12358264, 52.584438129), (42.082731979, 50.152247023))
            ThreePointArc((42.082731979, 50.152247023), (46.293650819, 46.293650819), (50.152247023, 42.082731979))
            Line((50.152247023, 42.082731979), (52.584438129, 44.12358264))
            ThreePointArc((52.584438129, 44.12358264), (48.538714849, 48.538714849), (44.12358264, 52.584438129))
        make_face()
    extrude(amount=BOSS_EXTRUDE10_DEPTH)

    # Sketch16 → Cut-Extrude11 (cut)
    with BuildSketch(Plane(origin=(0, 1.5875, 0), x_dir=(1, 0, 0), z_dir=(0, 1, 0)).offset(CUT_EXTRUDE11_START)):
        with BuildLine():
            Line((-23.477667944, -64.504362537), (-22.391753989, -61.520838466))
            ThreePointArc((-22.391753989, -61.520838466), (-32.73455442, -56.697911418), (-42.082731979, -50.152247022))
            Line((-42.082731979, -50.152247022), (-44.12358264, -52.584438129))
            ThreePointArc((-44.12358264, -52.584438129), (-34.32205442, -59.447542075), (-23.477667944, -64.504362537))
        make_face()
        with BuildLine():
            ThreePointArc((42.082731979, -50.152247022), (32.73455442, -56.697911418), (22.391753989, -61.520838466))
            Line((22.391753989, -61.520838466), (23.477667944, -64.504362537))
            ThreePointArc((23.477667944, -64.504362537), (34.32205442, -59.447542075), (44.12358264, -52.584438129))
            Line((44.12358264, -52.584438129), (42.082731979, -50.152247022))
        make_face()
    extrude(amount=CUT_EXTRUDE11_DEPTH, mode=Mode.SUBTRACT)

    # Sketch17 → Boss-Extrude11 (add)
    with BuildSketch(Plane(origin=(0, 1.5875, 0), x_dir=(1, 0, 0), z_dir=(0, 1, 0)).offset(BOSS_EXTRUDE11_START)):
        with BuildLine():
            Line((-11.919924408, -67.601250584), (-11.368591443, -64.474485968))
            ThreePointArc((-11.368591443, -64.474485968), (-16.944652234, -63.238303052), (-22.391753989, -61.520838466))
            Line((-22.391753989, -61.520838466), (-23.477667944, -64.504362537))
            ThreePointArc((-23.477667944, -64.504362537), (-17.766402702, -66.305117551), (-11.919924408, -67.601250584))
        make_face()
        with BuildLine():
            ThreePointArc((22.391753989, -61.520838466), (16.944652234, -63.238303052), (11.368591443, -64.474485968))
            Line((11.368591443, -64.474485968), (11.919924408, -67.601250584))
            ThreePointArc((11.919924408, -67.601250584), (17.766402702, -66.305117551), (23.477667944, -64.504362537))
            Line((23.477667944, -64.504362537), (22.391753989, -61.520838466))
        make_face()
    extrude(amount=BOSS_EXTRUDE11_DEPTH)

    # Sketch18 → Boss-Extrude14 (add)
    # profile 1 of 2: a face of its own
    with BuildSketch(Plane(origin=(0, 1.5875, 0), x_dir=(1, 0, 0), z_dir=(0, 1, 0))):
        with BuildLine():
            Line((-69.452614544, 12.919924408), (-67.601250584, 12.919924408))
            Line((-67.601250584, 12.919924408), (-63.46910884, 12.919924408))
            Line((-63.46910884, 12.919924408), (-63.46910884, -12.919924408))
            Line((-63.46910884, -12.919924408), (-67.601250584, -12.919924408))
            Line((-67.601250584, -12.919924408), (-69.452614544, -12.919924408))
            ThreePointArc((-69.452614544, -12.919924408), (-70.64410884, 0), (-69.452614544, 12.919924408))
        make_face()
        with Locations(Location((-66.586995079, 7.919924408, 0), (0, 0, 166.43409685))):
            Circle(SKETCH18_R, mode=Mode.SUBTRACT)
        with Locations(Location((-66.586995079, -7.919924408, 0), (0, 0, 13.56590315))):
            Circle(SKETCH18_R, mode=Mode.SUBTRACT)
    # profile 2 of 2: a face of its own
    with BuildSketch(Plane(origin=(0, 1.5875, 0), x_dir=(1, 0, 0), z_dir=(0, 1, 0))):
        with BuildLine():
            Line((69.452614544, -12.919924408), (67.601250584, -12.919924408))
            Line((67.601250584, -12.919924408), (63.46910884, -12.919924408))
            Line((63.46910884, -12.919924408), (63.46910884, 12.919924408))
            Line((63.46910884, 12.919924408), (67.601250584, 12.919924408))
            Line((67.601250584, 12.919924408), (69.452614544, 12.919924408))
            ThreePointArc((69.452614544, 12.919924408), (70.64410884, 0), (69.452614544, -12.919924408))
        make_face()
        with Locations(Location((66.586995079, -7.919924408, 0), (0, 0, 166.43409685))):
            Circle(SKETCH18_R, mode=Mode.SUBTRACT)
        with Locations(Location((66.586995079, 7.919924408, 0), (0, 0, 13.56590315))):
            Circle(SKETCH18_R, mode=Mode.SUBTRACT)
    extrude(amount=BOSS_EXTRUDE14_DEPTH)

    # Sketch22 → Boss-Extrude16 (add)
    with BuildSketch(Plane(origin=(0, 1.5875, 0), x_dir=(1, 0, 0), z_dir=(0, 1, 0))):
        with Locations((-62.46910884, 0)):
            Rectangle(SKETCH22_W, SKETCH22_H)
        with Locations((62.46910884, 0)):
            Rectangle(SKETCH22_W, SKETCH22_H)
    extrude(amount=BOSS_EXTRUDE16_DEPTH)

    # Sketch23 → Boss-Extrude17 (add)
    with BuildSketch(Plane(origin=(0, 77.7875, 0), x_dir=(1, 0, 0), z_dir=(0, 1, 0))):
        Rectangle(SKETCH23_W, SKETCH23_H)
    extrude(amount=-BOSS_EXTRUDE17_DEPTH)

    # Fillet7
    fillet7_edges = [part.edges().sort_by_distance(p)[0] for p in [
        (-63.46910884, 77.7875, 0),
        (63.46910884, 77.7875, 0),
        (61.46910884, 75.7875, 0),
        (-61.46910884, 75.7875, 0),
    ]]
    fillet(fillet7_edges, radius=FILLET7_R)

    # Sketch24 → Cut-Extrude12 (cut)
    with BuildSketch(Plane(origin=(0, 1.5875, 0), x_dir=(1, 0, 0), z_dir=(0, 1, 0)).offset(CUT_EXTRUDE12_START)):
        Circle(SKETCH24_R)
    extrude(amount=CUT_EXTRUDE12_DEPTH, mode=Mode.SUBTRACT)

    # Fillet11
    fillet11_edges = [part.edges().sort_by_distance(p)[0] for p in [
        (63.46910884, 35.6875, 12.919924408),
        (0, 77.7875, 12.919924408),
        (61.46910884, 33.6875, 12.919924408),
        (0, 75.7875, 12.919924408),
        (-63.46910884, 35.6875, 12.919924408),
        (-61.46910884, 33.6875, 12.919924408),
        (58.540176651, 72.858567812, 12.919924408),
        (-58.540176651, 72.858567812, 12.919924408),
        (-60.540176651, 74.858567812, 12.919924408),
        (60.540176651, 74.858567812, 12.919924408),
    ]]
    fillet(fillet11_edges, radius=FILLET11_R - 0.0001)  # a hair under: the kernel refuses the full size

    # Fillet12
    fillet12_edges = [part.edges().sort_by_distance(p)[0] for p in [
        (63.46910884, 35.6875, -12.919924408),
        (0, 77.7875, -12.919924408),
        (61.46910884, 33.6875, -12.919924408),
        (0, 75.7875, -12.919924408),
        (-63.46910884, 35.6875, -12.919924408),
        (-61.46910884, 33.6875, -12.919924408),
        (58.540176651, 72.858567812, -12.919924408),
        (-58.540176651, 72.858567812, -12.919924408),
        (-60.540176651, 74.858567812, -12.919924408),
        (60.540176651, 74.858567812, -12.919924408),
    ]]
    fillet(fillet12_edges, radius=FILLET12_R - 0.0001)  # a hair under: the kernel refuses the full size


solid = part.part
